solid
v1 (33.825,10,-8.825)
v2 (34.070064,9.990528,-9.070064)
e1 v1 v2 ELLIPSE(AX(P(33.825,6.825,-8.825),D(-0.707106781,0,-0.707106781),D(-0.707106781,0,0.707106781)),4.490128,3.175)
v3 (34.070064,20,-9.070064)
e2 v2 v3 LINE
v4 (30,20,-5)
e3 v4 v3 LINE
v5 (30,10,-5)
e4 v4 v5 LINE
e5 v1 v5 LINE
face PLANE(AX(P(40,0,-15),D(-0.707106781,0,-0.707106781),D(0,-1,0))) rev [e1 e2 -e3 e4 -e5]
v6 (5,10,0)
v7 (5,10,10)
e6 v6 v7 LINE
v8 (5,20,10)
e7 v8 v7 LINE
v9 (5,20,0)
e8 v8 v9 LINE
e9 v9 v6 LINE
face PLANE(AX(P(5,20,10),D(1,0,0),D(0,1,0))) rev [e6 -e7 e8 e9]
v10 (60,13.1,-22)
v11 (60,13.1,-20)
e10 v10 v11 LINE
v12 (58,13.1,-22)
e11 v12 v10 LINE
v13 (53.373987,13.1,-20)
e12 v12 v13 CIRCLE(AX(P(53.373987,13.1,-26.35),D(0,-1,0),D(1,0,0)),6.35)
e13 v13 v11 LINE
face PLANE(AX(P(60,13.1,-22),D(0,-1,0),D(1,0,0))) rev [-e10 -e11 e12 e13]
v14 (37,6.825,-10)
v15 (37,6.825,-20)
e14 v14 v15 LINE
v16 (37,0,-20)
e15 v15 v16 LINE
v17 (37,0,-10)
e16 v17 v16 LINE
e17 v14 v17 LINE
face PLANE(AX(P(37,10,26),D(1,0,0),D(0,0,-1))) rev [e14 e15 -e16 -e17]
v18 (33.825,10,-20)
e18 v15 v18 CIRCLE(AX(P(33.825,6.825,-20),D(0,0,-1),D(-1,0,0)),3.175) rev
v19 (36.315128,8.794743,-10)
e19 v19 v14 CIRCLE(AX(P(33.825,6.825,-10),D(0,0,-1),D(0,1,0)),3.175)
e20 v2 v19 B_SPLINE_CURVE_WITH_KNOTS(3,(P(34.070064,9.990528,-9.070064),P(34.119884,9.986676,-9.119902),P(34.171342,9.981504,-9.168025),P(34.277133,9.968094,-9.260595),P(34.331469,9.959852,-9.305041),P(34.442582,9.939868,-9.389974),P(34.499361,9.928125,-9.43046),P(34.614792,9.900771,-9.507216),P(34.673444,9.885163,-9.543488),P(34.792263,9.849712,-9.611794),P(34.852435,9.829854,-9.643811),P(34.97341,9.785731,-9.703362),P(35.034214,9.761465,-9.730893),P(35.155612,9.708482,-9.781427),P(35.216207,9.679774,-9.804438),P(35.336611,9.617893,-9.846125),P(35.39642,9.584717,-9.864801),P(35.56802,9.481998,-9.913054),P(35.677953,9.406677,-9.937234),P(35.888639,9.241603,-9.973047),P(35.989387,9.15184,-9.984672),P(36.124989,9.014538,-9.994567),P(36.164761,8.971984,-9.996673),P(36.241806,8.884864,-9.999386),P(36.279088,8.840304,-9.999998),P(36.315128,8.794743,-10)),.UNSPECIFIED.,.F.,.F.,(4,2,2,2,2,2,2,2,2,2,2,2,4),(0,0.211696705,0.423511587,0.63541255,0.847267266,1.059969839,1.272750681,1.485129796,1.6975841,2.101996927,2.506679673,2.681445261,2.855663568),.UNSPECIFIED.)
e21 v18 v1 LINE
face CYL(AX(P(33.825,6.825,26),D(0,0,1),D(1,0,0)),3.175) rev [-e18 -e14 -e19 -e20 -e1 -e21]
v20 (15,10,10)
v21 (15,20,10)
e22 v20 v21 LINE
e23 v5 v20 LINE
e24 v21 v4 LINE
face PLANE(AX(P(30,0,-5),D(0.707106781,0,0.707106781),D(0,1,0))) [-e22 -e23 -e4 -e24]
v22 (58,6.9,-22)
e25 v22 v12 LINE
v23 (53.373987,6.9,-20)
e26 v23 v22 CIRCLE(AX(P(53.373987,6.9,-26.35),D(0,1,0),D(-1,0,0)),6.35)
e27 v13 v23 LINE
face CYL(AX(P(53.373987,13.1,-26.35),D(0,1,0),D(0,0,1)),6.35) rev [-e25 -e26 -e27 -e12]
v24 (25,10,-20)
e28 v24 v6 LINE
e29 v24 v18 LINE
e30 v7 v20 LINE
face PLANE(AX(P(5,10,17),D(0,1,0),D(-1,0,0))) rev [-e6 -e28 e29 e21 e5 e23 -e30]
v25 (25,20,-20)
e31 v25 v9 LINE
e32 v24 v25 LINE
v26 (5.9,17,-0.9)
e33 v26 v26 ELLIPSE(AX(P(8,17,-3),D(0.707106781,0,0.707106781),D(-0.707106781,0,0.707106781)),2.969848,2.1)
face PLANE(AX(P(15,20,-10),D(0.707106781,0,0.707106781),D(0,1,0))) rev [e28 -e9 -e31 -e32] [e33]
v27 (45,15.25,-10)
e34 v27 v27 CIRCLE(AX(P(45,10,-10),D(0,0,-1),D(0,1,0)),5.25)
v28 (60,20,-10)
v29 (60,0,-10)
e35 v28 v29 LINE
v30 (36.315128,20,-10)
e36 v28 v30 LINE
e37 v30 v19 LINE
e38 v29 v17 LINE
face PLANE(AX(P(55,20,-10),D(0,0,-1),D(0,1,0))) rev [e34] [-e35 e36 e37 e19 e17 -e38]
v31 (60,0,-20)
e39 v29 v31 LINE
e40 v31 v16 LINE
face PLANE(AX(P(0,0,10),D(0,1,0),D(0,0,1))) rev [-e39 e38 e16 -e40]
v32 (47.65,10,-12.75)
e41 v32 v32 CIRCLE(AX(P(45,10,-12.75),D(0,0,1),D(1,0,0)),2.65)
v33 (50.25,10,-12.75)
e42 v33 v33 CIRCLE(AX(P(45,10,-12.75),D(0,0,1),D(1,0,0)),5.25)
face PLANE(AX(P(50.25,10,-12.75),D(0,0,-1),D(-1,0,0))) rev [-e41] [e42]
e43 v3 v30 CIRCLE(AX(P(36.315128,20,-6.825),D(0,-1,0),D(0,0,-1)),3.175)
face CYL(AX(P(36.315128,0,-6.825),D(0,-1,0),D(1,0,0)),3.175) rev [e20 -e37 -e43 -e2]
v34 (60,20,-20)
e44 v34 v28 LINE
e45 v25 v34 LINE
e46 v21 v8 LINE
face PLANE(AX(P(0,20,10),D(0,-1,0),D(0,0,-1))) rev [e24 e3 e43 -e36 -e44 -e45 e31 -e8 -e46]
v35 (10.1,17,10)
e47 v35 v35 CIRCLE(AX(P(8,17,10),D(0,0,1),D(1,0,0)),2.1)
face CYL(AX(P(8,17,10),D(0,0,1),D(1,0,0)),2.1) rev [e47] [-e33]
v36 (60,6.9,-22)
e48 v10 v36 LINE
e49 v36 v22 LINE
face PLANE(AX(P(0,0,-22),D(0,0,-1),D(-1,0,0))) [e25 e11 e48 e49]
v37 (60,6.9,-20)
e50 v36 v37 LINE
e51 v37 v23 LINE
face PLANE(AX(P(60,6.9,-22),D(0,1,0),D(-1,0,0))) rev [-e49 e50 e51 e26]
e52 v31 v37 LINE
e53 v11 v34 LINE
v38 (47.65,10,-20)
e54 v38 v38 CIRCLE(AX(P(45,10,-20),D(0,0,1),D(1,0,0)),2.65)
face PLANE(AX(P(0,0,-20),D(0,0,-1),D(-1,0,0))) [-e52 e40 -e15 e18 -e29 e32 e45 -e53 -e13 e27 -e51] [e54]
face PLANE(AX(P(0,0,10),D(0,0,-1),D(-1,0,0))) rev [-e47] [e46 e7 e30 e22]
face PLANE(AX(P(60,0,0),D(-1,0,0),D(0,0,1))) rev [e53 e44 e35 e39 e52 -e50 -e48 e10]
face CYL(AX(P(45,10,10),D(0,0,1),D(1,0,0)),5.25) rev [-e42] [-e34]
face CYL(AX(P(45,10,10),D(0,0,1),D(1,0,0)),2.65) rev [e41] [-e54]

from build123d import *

# Parameters (mm, degrees)
SKETCH1_W                  = 15
SKETCH1_H                  = 20
BOSS_EXTRUDE1_DEPTH        = 10
F_4_2_4_2_DIAMETER_HOLE1_D = 4.2
SKETCH4_W                  = 10
SKETCH4_H                  = 20
BOSS_EXTRUDE2_DEPTH        = 15
SKETCH5_W                  = 15
SKETCH5_H                  = 20
BOSS_EXTRUDE3_DEPTH        = 20
CHAMFER1_SIZE              = 10
CHAMFER2_SIZE              = 15
SKETCH6_W                  = 5
SKETCH6_H                  = 20
CUT_EXTRUDE1_DEPTH         = 10
SKETCH8_W                  = 15
SKETCH8_H                  = 20
BOSS_EXTRUDE4_DEPTH        = 10
CHAMFER3_SIZE              = 10
SKETCH7_W                  = 10
SKETCH7_H                  = 20
BOSS_EXTRUDE5_DEPTH        = 25
FILLET5_R                  = 3.175
SKETCH9_W                  = 10
SKETCH9_H                  = 10
CUT_EXTRUDE4_DEPTH         = 37
SKETCH15_W                 = 35.287710309
SKETCH15_H                 = 35.27052657
CUT_EXTRUDE5_DEPTH         = 10
SKETCH16_W                 = 32
SKETCH16_H                 = 10
CUT_EXTRUDE6_DEPTH         = 46
MOVE_FACE1_BY              = 5
SKETCH19_W                 = 2
SKETCH19_H                 = 6.2
BOSS_EXTRUDE6_DEPTH        = 2
FILLET6_R                  = 6.35
FILLET7_R                  = 3.175


# Some blends are built 0.0001 mm under size
with BuildPart() as part:
    # Sketch1 → Boss-Extrude1 (new body)
    with BuildSketch(Plane.XY):
        with Locations((7.5, 10)):
            Rectangle(SKETCH1_W, SKETCH1_H)
    extrude(amount=BOSS_EXTRUDE1_DEPTH)

    # Ø4.2 (4.2) Diameter Hole1 (through all)
    with Locations(Plane.XY.offset(10)):
        with Locations((8, 17)):
            Hole(F_4_2_4_2_DIAMETER_HOLE1_D / 2)

    # Sketch4 → Boss-Extrude2 (add)
    with BuildSketch(Plane(origin=(15, 0, 0), x_dir=(0, 0, -1), z_dir=(1, 0, 0))):
        with Locations((-5, 10)):
            Rectangle(SKETCH4_W, SKETCH4_H)
    extrude(amount=BOSS_EXTRUDE2_DEPTH)

    # Sketch5 → Boss-Extrude3 (add)
    with BuildSketch(Plane(origin=(0, 0, 0), x_dir=(-1, 0, 0), z_dir=(0, 0, -1))):
        with Locations((-22.5, 10)):
            Rectangle(SKETCH5_W, SKETCH5_H)
    extrude(amount=BOSS_EXTRUDE3_DEPTH)

    # Chamfer1
    # the kernel refuses this chamfer: 10 mm, written as the material it adds along each edge
    with BuildSketch(Plane(origin=(15, 20, 0), x_dir=(-0.9996219169112968, 0, 0.027495876610586372), z_dir=(0, -1, 0))) as chamfer1_piece_1_section:
        Polygon((CHAMFER1_SIZE * 0.999621916911, CHAMFER1_SIZE * 0.0274958766106), (-CHAMFER1_SIZE * 0.0274958766106, CHAMFER1_SIZE * 0.999621916911), (0, 0), align=None)
    chamfer1_piece_1 = extrude(amount=20, mode=Mode.PRIVATE)
    chamfer1_piece_1 = chamfer1_piece_1 - Plane(origin=(8, 17, -3.373966189), x_dir=(-1, 0, 0), z_dir=(0, 0, -1)) * Cylinder(2.1, 80, mode=Mode.PRIVATE)
    add(chamfer1_piece_1)

    # Chamfer2
    chamfer2_edges = [part.edges().sort_by_distance(p)[0] for p in [
        (30, 10, 10),
    ]]
    chamfer(chamfer2_edges, length=CHAMFER2_SIZE)

    # Sketch6 → Cut-Extrude1 (cut)
    with BuildSketch(Plane(origin=(0, 0, 0), x_dir=(-1, 0, 0), z_dir=(0, 0, -1))):
        with Locations((-2.5, 10)):
            Rectangle(SKETCH6_W, SKETCH6_H)
    extrude(amount=-CUT_EXTRUDE1_DEPTH, mode=Mode.SUBTRACT)

    # Sketch8 → Boss-Extrude4 (add)
    with BuildSketch(Plane(origin=(30, 0, 0), x_dir=(0, 0, -1), z_dir=(1, 0, 0))):
        with Locations((12.5, 10)):
            Rectangle(SKETCH8_W, SKETCH8_H)
    extrude(amount=BOSS_EXTRUDE4_DEPTH)

    # Chamfer3
    chamfer3_edges = [part.edges().sort_by_distance(p)[0] for p in [
        (40, 10, -5),
    ]]
    chamfer(chamfer3_edges, length=CHAMFER3_SIZE - 0.0001)  # a hair under: the kernel refuses the full size

    # Sketch7 → Boss-Extrude5 (add)
    with BuildSketch(Plane(origin=(30, 0, 0), x_dir=(0, 0, -1), z_dir=(1, 0, 0))):
        with Locations((15, 10)):
            Rectangle(SKETCH7_W, SKETCH7_H)
    extrude(amount=BOSS_EXTRUDE5_DEPTH)

    # Fillet5
    fillet5_edges = [part.edges().sort_by_distance(p)[0] for p in [
        (35.0001, 10, -10),
    ]]
    fillet(fillet5_edges, radius=FILLET5_R)

    # Sketch9 → Cut-Extrude4 (cut)
    with BuildSketch(Plane(origin=(0, 0, -20), x_dir=(-1, 0, 0), z_dir=(0, 0, -1))):
        with Locations((-10, 5)):
            Rectangle(SKETCH9_W, SKETCH9_H)
    extrude(amount=-CUT_EXTRUDE4_DEPTH, mode=Mode.SUBTRACT)

    # Sketch14 → CBORE for M5 SBHCS2 (revolve, cut)
    with BuildSketch(Plane(origin=(45, 10, 10), x_dir=(0, -1, 0), z_dir=(1, 0, 0))):
        Polygon((0, 0), (0, 30), (2.65, 30), (2.65, 22.75), (5.25, 22.75), (5.25, 0.020977491), (5.275, 0), align=None)
    revolve(axis=Axis((45, 10, 16.35), (0, 0, -1)), mode=Mode.SUBTRACT)

    # Sketch15 → Cut-Extrude5 (cut)
    with BuildSketch(Plane(origin=(2.5, 0, 2.5), x_dir=(-0.707106781186544, 0, 0.7071067811865511), z_dir=(-0.7071067811865511, 0, -0.707106781186544))):
        with Locations((-14.684853065, 9.385409348)):
            Rectangle(SKETCH15_W, SKETCH15_H)
    extrude(amount=CUT_EXTRUDE5_DEPTH, mode=Mode.SUBTRACT)

    # Sketch16 → Cut-Extrude6 (cut)
    with BuildSketch(Plane(origin=(0, 0, -20), x_dir=(-1, 0, 0), z_dir=(0, 0, -1))):
        with Locations((-21, 5)):
            Rectangle(SKETCH16_W, SKETCH16_H)
    extrude(amount=-CUT_EXTRUDE6_DEPTH, mode=Mode.SUBTRACT)

    # Move Face1: a face moved outward by 5.0
    extrude(part.faces().sort_by_distance((55, 10, -15))[0], amount=MOVE_FACE1_BY, dir=(1, 0, 0))

    # Sketch19 → Boss-Extrude6 (add)
    with BuildSketch(Plane(origin=(0, 0, -20), x_dir=(-1, 0, 0), z_dir=(0, 0, -1))):
        with Locations((-59, 10)):
            Rectangle(SKETCH19_W, SKETCH19_H)
    extrude(amount=BOSS_EXTRUDE6_DEPTH)

    # Fillet6
    # the kernel refuses this fillet: 6.35 mm, written as the material it adds along each edge
    with BuildSketch(Plane(origin=(58, 13.1, -20), x_dir=(-1, 0, 0), z_dir=(0, -1, 0))) as fillet6_piece_1:
        with BuildLine():
            CenterArc((4.626013402, 6.35), FILLET6_R, 223.238703461, 46.761296539)
            Line((0, 2), (-0.092520268, 1.913))
            ThreePointArc((-0.092520268, 1.913), (-0.127, 1), (-0.127, 0))
            Line((-0.127, 0), (0, -0.127))
            Line((0, -0.127), (4.626013402, -0.127))
            Line((4.626013402, -0.127), (4.626013402, 0))
        make_face()
    extrude(amount=6.2)

    # Fillet7
    fillet7_edges = [part.edges().sort_by_distance(p)[0] for p in [
        (37, 10, -15),
    ]]
    fillet(fillet7_edges, radius=FILLET7_R)


solid = part.part
